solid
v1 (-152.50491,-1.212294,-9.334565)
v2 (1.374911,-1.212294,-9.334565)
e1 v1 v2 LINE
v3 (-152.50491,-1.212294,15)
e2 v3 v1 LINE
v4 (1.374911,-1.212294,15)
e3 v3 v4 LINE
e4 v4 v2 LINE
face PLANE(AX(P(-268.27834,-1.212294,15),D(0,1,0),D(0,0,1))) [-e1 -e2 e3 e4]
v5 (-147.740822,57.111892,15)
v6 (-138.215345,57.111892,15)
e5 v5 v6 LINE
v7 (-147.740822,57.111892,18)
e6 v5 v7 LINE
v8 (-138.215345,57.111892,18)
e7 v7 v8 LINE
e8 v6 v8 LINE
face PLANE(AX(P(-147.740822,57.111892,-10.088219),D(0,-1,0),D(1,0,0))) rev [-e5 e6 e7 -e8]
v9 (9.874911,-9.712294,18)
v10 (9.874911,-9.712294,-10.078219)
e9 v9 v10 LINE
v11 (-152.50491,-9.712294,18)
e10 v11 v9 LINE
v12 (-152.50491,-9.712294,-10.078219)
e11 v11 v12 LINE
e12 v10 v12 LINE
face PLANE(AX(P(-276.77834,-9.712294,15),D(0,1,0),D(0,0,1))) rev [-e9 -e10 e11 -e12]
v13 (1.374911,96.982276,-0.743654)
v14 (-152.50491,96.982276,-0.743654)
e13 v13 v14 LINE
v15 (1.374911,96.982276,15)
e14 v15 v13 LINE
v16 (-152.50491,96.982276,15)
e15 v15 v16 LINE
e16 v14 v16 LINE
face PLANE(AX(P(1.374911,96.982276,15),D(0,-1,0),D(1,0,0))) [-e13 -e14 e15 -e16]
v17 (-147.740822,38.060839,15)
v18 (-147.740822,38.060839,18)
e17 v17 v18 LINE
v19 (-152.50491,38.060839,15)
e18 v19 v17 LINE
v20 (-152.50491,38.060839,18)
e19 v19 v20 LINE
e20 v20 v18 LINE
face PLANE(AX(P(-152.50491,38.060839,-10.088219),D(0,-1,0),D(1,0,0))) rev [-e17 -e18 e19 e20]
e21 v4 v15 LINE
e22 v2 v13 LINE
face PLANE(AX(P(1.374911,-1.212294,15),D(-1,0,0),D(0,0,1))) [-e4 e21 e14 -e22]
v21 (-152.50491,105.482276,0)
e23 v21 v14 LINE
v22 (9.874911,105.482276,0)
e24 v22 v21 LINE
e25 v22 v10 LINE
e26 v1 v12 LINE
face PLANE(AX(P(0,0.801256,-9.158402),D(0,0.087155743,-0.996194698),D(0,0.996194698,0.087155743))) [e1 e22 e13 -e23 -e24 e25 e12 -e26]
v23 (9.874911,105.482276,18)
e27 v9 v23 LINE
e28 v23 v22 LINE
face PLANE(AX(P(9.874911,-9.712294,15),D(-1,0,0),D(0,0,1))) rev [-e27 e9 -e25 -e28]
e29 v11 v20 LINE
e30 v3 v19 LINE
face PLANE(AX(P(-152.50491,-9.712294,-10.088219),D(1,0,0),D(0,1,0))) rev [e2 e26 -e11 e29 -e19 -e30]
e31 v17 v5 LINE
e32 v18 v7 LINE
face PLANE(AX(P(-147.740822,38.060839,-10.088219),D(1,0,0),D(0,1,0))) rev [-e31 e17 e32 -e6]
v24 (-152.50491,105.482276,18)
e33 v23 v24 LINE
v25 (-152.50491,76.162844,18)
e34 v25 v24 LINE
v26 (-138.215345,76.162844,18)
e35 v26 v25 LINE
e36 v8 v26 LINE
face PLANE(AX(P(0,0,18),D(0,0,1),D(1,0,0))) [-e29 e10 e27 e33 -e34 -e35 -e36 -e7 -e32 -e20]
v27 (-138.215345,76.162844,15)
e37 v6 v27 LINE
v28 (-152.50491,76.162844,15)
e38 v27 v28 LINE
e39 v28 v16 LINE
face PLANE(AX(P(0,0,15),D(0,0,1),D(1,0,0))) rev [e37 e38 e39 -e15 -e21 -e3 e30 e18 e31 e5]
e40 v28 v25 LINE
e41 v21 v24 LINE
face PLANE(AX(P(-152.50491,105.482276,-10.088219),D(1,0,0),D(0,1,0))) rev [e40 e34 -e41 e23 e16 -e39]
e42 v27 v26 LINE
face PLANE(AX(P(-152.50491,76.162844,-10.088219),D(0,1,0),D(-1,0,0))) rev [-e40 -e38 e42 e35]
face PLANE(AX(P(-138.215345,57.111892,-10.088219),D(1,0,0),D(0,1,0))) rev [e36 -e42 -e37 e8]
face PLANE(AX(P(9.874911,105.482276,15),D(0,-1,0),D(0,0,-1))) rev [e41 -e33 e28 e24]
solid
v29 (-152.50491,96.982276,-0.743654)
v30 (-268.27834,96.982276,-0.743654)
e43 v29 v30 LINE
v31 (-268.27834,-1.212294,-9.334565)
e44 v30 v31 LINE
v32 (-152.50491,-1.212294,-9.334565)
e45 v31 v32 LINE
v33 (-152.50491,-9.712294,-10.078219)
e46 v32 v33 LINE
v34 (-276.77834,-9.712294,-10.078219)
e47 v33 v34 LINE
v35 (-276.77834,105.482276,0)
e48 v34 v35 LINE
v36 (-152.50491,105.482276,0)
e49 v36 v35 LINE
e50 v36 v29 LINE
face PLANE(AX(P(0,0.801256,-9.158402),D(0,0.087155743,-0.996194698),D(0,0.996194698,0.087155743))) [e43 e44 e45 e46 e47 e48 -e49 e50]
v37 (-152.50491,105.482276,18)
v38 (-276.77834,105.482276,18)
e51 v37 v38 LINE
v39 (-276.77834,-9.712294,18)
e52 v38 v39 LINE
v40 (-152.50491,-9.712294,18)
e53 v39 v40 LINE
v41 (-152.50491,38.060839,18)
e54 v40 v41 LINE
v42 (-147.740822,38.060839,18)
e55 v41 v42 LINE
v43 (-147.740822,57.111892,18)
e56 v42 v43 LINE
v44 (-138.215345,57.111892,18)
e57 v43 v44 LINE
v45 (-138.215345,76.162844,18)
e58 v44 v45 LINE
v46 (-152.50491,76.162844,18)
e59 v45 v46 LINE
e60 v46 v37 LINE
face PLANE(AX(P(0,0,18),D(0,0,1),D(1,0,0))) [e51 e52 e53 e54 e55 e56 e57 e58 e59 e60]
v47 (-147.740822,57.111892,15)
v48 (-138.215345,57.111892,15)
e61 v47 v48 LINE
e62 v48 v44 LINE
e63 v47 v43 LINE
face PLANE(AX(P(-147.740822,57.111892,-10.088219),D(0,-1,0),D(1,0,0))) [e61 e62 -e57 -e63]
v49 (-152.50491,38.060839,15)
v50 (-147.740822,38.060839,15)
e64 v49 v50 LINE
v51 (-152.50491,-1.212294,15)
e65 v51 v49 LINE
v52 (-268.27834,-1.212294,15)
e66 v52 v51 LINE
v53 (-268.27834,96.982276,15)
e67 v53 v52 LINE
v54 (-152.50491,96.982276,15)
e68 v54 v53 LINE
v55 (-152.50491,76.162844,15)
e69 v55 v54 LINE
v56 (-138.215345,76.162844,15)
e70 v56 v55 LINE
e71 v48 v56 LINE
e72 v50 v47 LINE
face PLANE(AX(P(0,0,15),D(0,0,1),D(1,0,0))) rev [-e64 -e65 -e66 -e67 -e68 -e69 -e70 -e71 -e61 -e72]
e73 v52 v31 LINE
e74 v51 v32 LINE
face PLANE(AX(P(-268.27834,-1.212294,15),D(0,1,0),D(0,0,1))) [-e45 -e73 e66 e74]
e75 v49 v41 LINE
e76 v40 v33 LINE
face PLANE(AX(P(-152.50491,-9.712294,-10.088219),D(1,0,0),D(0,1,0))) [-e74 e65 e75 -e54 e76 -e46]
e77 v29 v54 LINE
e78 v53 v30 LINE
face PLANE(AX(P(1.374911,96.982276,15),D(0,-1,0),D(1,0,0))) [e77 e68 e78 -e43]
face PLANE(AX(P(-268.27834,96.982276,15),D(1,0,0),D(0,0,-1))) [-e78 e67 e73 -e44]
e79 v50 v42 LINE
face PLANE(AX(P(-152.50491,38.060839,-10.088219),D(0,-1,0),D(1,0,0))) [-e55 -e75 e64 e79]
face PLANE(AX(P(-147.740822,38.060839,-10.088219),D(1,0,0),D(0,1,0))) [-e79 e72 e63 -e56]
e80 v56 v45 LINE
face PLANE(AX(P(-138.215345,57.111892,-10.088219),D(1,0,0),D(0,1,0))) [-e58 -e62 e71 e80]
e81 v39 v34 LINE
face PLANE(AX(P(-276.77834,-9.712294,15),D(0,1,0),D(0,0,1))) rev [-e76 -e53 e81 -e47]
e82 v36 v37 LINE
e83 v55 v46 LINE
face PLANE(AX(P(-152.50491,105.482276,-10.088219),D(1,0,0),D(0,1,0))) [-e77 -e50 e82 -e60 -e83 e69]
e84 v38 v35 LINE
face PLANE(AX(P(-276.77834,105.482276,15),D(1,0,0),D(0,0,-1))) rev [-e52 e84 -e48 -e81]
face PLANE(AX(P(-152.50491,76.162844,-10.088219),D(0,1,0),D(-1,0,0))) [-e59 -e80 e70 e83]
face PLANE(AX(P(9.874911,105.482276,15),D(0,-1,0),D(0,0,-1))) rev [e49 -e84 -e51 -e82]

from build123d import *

# Parameters (mm, degrees)
SKETCH1_W              = 286.653251063
SKETCH1_H              = 115.194569729
SKETCH1_W_2            = 269.653251063
SKETCH1_H_2            = 98.194569729
BOSS_EXTRUDE1_DEPTH    = 15
SKETCH2_W              = 286.653251063
SKETCH2_H              = 115.194569729
BOSS_EXTRUDE2_DEPTH    = 3
BOSS_EXTRUDE5_START    = -276.778340417
BOSS_EXTRUDE5_DEPTH    = 286.653251063
BOSS_EXTRUDE5_2_DEPTH  = 8.5
BOSS_EXTRUDE5_START_2  = 1.374910646
BOSS_EXTRUDE5_3_DEPTH  = 8.5
SPLIT1_SURFACE_1_BACK  = 311.207
SPLIT1_SURFACE_1_DEPTH = 622.414
SPLIT1_SURFACE_2_BACK  = 311.207
SPLIT1_SURFACE_2_DEPTH = 622.414


# Read off the part's stored shape, not the designer's step: Boss-Extrude5
with BuildPart() as part:
    # Sketch1 → Boss-Extrude1 (new body)
    with BuildSketch(Plane.XY):
        with Locations((-133.451714886, 47.884990749)):
            Rectangle(SKETCH1_W, SKETCH1_H)
        with Locations((-133.451714886, 47.884990749)):
            Rectangle(SKETCH1_W_2, SKETCH1_H_2, mode=Mode.SUBTRACT)
    extrude(amount=BOSS_EXTRUDE1_DEPTH)

    # Sketch2 → Boss-Extrude2 (add)
    with BuildSketch(Plane.XY.offset(15)):
        with Locations((-133.451714886, 47.884990749)):
            Rectangle(SKETCH2_W, SKETCH2_H)
    extrude(amount=BOSS_EXTRUDE2_DEPTH)

    # Boss-Extrude5 outline → Boss-Extrude5 (add)
    with BuildSketch(Plane.YZ.offset(BOSS_EXTRUDE5_START)):
        Polygon((-9.712294115, 0), (-9.712294115, -10.078218951), (-1.212294115, -9.334565311), (-1.212294115, 0), align=None)
        Polygon((96.982275614, 0), (96.982275614, -0.74365364), (105.482275614, 0), align=None)
    extrude(amount=BOSS_EXTRUDE5_DEPTH)

    # Boss-Extrude5 2 outline → Boss-Extrude5 2 (add)
    with BuildSketch(Plane.YZ.offset(BOSS_EXTRUDE5_START)):
        Polygon((-1.212294115, 0), (-1.212294115, -9.334565311), (96.982275614, -0.74365364), (96.982275614, 0), align=None)
    extrude(amount=BOSS_EXTRUDE5_2_DEPTH)

    # Boss-Extrude5 3 outline → Boss-Extrude5 3 (add)
    with BuildSketch(Plane.YZ.offset(BOSS_EXTRUDE5_START_2)):
        Polygon((-1.212294115, 0), (-1.212294115, -9.334565311), (96.982275614, -0.74365364), (96.982275614, 0), align=None)
    extrude(amount=BOSS_EXTRUDE5_3_DEPTH)


with BuildPart() as body_2:
    # Split1: the piece behind the surface
    add(part.part)
    # Split1 surface: a surface, the sketch's curves swept straight by 622.414 mm
    with BuildLine(Plane.XY.offset(18).offset(-SPLIT1_SURFACE_1_BACK), mode=Mode.PRIVATE) as split1_surface_1_path:
        Line((-152.504909845, 105.482275614), (-152.504909845, 76.162844284))
        Line((-152.504909845, 76.162844284), (-138.215345367, 76.162844284))
        Line((-138.215345367, 76.162844284), (-138.215345367, 57.111891736))
        Line((-138.215345367, 57.111891736), (-147.740821641, 57.111891736))
        Line((-147.740821641, 57.111891736), (-147.740821641, 38.060839184))
        Line((-147.740821641, 38.060839184), (-152.504909845, 38.060839184))
        Line((-152.504909845, 38.060839184), (-152.504909845, -9.712294115))
        Line((-152.504909845, -9.712294115), (-276.778340417, -9.712294115))
        Line((-276.778340417, -9.712294115), (-276.778340417, 105.482275614))
        Line((-276.778340417, 105.482275614), (-152.504909845, 105.482275614))
    split1_surface_1 = Shell.extrude(split1_surface_1_path.wire(), (0 * SPLIT1_SURFACE_1_DEPTH, 0 * SPLIT1_SURFACE_1_DEPTH, 1 * SPLIT1_SURFACE_1_DEPTH))
    split(bisect_by=split1_surface_1, keep=Keep.BOTTOM)


with BuildPart() as part_1:
    add(part.part)

    # Split1: split by a surface, the side it looks to stays
    # Split1 surface: a surface, the sketch's curves swept straight by 622.414 mm
    with BuildLine(Plane.XY.offset(18).offset(-SPLIT1_SURFACE_2_BACK), mode=Mode.PRIVATE) as split1_surface_2_path:
        Line((-152.504909845, 105.482275614), (-152.504909845, 76.162844284))
        Line((-152.504909845, 76.162844284), (-138.215345367, 76.162844284))
        Line((-138.215345367, 76.162844284), (-138.215345367, 57.111891736))
        Line((-138.215345367, 57.111891736), (-147.740821641, 57.111891736))
        Line((-147.740821641, 57.111891736), (-147.740821641, 38.060839184))
        Line((-147.740821641, 38.060839184), (-152.504909845, 38.060839184))
        Line((-152.504909845, 38.060839184), (-152.504909845, -9.712294115))
        Line((-152.504909845, -9.712294115), (-276.778340417, -9.712294115))
        Line((-276.778340417, -9.712294115), (-276.778340417, 105.482275614))
        Line((-276.778340417, 105.482275614), (-152.504909845, 105.482275614))
    split1_surface_2 = Shell.extrude(split1_surface_2_path.wire(), (0 * SPLIT1_SURFACE_2_DEPTH, 0 * SPLIT1_SURFACE_2_DEPTH, 1 * SPLIT1_SURFACE_2_DEPTH))
    split(bisect_by=split1_surface_2, keep=Keep.TOP)


solid = Compound([body_2.part, part_1.part])
